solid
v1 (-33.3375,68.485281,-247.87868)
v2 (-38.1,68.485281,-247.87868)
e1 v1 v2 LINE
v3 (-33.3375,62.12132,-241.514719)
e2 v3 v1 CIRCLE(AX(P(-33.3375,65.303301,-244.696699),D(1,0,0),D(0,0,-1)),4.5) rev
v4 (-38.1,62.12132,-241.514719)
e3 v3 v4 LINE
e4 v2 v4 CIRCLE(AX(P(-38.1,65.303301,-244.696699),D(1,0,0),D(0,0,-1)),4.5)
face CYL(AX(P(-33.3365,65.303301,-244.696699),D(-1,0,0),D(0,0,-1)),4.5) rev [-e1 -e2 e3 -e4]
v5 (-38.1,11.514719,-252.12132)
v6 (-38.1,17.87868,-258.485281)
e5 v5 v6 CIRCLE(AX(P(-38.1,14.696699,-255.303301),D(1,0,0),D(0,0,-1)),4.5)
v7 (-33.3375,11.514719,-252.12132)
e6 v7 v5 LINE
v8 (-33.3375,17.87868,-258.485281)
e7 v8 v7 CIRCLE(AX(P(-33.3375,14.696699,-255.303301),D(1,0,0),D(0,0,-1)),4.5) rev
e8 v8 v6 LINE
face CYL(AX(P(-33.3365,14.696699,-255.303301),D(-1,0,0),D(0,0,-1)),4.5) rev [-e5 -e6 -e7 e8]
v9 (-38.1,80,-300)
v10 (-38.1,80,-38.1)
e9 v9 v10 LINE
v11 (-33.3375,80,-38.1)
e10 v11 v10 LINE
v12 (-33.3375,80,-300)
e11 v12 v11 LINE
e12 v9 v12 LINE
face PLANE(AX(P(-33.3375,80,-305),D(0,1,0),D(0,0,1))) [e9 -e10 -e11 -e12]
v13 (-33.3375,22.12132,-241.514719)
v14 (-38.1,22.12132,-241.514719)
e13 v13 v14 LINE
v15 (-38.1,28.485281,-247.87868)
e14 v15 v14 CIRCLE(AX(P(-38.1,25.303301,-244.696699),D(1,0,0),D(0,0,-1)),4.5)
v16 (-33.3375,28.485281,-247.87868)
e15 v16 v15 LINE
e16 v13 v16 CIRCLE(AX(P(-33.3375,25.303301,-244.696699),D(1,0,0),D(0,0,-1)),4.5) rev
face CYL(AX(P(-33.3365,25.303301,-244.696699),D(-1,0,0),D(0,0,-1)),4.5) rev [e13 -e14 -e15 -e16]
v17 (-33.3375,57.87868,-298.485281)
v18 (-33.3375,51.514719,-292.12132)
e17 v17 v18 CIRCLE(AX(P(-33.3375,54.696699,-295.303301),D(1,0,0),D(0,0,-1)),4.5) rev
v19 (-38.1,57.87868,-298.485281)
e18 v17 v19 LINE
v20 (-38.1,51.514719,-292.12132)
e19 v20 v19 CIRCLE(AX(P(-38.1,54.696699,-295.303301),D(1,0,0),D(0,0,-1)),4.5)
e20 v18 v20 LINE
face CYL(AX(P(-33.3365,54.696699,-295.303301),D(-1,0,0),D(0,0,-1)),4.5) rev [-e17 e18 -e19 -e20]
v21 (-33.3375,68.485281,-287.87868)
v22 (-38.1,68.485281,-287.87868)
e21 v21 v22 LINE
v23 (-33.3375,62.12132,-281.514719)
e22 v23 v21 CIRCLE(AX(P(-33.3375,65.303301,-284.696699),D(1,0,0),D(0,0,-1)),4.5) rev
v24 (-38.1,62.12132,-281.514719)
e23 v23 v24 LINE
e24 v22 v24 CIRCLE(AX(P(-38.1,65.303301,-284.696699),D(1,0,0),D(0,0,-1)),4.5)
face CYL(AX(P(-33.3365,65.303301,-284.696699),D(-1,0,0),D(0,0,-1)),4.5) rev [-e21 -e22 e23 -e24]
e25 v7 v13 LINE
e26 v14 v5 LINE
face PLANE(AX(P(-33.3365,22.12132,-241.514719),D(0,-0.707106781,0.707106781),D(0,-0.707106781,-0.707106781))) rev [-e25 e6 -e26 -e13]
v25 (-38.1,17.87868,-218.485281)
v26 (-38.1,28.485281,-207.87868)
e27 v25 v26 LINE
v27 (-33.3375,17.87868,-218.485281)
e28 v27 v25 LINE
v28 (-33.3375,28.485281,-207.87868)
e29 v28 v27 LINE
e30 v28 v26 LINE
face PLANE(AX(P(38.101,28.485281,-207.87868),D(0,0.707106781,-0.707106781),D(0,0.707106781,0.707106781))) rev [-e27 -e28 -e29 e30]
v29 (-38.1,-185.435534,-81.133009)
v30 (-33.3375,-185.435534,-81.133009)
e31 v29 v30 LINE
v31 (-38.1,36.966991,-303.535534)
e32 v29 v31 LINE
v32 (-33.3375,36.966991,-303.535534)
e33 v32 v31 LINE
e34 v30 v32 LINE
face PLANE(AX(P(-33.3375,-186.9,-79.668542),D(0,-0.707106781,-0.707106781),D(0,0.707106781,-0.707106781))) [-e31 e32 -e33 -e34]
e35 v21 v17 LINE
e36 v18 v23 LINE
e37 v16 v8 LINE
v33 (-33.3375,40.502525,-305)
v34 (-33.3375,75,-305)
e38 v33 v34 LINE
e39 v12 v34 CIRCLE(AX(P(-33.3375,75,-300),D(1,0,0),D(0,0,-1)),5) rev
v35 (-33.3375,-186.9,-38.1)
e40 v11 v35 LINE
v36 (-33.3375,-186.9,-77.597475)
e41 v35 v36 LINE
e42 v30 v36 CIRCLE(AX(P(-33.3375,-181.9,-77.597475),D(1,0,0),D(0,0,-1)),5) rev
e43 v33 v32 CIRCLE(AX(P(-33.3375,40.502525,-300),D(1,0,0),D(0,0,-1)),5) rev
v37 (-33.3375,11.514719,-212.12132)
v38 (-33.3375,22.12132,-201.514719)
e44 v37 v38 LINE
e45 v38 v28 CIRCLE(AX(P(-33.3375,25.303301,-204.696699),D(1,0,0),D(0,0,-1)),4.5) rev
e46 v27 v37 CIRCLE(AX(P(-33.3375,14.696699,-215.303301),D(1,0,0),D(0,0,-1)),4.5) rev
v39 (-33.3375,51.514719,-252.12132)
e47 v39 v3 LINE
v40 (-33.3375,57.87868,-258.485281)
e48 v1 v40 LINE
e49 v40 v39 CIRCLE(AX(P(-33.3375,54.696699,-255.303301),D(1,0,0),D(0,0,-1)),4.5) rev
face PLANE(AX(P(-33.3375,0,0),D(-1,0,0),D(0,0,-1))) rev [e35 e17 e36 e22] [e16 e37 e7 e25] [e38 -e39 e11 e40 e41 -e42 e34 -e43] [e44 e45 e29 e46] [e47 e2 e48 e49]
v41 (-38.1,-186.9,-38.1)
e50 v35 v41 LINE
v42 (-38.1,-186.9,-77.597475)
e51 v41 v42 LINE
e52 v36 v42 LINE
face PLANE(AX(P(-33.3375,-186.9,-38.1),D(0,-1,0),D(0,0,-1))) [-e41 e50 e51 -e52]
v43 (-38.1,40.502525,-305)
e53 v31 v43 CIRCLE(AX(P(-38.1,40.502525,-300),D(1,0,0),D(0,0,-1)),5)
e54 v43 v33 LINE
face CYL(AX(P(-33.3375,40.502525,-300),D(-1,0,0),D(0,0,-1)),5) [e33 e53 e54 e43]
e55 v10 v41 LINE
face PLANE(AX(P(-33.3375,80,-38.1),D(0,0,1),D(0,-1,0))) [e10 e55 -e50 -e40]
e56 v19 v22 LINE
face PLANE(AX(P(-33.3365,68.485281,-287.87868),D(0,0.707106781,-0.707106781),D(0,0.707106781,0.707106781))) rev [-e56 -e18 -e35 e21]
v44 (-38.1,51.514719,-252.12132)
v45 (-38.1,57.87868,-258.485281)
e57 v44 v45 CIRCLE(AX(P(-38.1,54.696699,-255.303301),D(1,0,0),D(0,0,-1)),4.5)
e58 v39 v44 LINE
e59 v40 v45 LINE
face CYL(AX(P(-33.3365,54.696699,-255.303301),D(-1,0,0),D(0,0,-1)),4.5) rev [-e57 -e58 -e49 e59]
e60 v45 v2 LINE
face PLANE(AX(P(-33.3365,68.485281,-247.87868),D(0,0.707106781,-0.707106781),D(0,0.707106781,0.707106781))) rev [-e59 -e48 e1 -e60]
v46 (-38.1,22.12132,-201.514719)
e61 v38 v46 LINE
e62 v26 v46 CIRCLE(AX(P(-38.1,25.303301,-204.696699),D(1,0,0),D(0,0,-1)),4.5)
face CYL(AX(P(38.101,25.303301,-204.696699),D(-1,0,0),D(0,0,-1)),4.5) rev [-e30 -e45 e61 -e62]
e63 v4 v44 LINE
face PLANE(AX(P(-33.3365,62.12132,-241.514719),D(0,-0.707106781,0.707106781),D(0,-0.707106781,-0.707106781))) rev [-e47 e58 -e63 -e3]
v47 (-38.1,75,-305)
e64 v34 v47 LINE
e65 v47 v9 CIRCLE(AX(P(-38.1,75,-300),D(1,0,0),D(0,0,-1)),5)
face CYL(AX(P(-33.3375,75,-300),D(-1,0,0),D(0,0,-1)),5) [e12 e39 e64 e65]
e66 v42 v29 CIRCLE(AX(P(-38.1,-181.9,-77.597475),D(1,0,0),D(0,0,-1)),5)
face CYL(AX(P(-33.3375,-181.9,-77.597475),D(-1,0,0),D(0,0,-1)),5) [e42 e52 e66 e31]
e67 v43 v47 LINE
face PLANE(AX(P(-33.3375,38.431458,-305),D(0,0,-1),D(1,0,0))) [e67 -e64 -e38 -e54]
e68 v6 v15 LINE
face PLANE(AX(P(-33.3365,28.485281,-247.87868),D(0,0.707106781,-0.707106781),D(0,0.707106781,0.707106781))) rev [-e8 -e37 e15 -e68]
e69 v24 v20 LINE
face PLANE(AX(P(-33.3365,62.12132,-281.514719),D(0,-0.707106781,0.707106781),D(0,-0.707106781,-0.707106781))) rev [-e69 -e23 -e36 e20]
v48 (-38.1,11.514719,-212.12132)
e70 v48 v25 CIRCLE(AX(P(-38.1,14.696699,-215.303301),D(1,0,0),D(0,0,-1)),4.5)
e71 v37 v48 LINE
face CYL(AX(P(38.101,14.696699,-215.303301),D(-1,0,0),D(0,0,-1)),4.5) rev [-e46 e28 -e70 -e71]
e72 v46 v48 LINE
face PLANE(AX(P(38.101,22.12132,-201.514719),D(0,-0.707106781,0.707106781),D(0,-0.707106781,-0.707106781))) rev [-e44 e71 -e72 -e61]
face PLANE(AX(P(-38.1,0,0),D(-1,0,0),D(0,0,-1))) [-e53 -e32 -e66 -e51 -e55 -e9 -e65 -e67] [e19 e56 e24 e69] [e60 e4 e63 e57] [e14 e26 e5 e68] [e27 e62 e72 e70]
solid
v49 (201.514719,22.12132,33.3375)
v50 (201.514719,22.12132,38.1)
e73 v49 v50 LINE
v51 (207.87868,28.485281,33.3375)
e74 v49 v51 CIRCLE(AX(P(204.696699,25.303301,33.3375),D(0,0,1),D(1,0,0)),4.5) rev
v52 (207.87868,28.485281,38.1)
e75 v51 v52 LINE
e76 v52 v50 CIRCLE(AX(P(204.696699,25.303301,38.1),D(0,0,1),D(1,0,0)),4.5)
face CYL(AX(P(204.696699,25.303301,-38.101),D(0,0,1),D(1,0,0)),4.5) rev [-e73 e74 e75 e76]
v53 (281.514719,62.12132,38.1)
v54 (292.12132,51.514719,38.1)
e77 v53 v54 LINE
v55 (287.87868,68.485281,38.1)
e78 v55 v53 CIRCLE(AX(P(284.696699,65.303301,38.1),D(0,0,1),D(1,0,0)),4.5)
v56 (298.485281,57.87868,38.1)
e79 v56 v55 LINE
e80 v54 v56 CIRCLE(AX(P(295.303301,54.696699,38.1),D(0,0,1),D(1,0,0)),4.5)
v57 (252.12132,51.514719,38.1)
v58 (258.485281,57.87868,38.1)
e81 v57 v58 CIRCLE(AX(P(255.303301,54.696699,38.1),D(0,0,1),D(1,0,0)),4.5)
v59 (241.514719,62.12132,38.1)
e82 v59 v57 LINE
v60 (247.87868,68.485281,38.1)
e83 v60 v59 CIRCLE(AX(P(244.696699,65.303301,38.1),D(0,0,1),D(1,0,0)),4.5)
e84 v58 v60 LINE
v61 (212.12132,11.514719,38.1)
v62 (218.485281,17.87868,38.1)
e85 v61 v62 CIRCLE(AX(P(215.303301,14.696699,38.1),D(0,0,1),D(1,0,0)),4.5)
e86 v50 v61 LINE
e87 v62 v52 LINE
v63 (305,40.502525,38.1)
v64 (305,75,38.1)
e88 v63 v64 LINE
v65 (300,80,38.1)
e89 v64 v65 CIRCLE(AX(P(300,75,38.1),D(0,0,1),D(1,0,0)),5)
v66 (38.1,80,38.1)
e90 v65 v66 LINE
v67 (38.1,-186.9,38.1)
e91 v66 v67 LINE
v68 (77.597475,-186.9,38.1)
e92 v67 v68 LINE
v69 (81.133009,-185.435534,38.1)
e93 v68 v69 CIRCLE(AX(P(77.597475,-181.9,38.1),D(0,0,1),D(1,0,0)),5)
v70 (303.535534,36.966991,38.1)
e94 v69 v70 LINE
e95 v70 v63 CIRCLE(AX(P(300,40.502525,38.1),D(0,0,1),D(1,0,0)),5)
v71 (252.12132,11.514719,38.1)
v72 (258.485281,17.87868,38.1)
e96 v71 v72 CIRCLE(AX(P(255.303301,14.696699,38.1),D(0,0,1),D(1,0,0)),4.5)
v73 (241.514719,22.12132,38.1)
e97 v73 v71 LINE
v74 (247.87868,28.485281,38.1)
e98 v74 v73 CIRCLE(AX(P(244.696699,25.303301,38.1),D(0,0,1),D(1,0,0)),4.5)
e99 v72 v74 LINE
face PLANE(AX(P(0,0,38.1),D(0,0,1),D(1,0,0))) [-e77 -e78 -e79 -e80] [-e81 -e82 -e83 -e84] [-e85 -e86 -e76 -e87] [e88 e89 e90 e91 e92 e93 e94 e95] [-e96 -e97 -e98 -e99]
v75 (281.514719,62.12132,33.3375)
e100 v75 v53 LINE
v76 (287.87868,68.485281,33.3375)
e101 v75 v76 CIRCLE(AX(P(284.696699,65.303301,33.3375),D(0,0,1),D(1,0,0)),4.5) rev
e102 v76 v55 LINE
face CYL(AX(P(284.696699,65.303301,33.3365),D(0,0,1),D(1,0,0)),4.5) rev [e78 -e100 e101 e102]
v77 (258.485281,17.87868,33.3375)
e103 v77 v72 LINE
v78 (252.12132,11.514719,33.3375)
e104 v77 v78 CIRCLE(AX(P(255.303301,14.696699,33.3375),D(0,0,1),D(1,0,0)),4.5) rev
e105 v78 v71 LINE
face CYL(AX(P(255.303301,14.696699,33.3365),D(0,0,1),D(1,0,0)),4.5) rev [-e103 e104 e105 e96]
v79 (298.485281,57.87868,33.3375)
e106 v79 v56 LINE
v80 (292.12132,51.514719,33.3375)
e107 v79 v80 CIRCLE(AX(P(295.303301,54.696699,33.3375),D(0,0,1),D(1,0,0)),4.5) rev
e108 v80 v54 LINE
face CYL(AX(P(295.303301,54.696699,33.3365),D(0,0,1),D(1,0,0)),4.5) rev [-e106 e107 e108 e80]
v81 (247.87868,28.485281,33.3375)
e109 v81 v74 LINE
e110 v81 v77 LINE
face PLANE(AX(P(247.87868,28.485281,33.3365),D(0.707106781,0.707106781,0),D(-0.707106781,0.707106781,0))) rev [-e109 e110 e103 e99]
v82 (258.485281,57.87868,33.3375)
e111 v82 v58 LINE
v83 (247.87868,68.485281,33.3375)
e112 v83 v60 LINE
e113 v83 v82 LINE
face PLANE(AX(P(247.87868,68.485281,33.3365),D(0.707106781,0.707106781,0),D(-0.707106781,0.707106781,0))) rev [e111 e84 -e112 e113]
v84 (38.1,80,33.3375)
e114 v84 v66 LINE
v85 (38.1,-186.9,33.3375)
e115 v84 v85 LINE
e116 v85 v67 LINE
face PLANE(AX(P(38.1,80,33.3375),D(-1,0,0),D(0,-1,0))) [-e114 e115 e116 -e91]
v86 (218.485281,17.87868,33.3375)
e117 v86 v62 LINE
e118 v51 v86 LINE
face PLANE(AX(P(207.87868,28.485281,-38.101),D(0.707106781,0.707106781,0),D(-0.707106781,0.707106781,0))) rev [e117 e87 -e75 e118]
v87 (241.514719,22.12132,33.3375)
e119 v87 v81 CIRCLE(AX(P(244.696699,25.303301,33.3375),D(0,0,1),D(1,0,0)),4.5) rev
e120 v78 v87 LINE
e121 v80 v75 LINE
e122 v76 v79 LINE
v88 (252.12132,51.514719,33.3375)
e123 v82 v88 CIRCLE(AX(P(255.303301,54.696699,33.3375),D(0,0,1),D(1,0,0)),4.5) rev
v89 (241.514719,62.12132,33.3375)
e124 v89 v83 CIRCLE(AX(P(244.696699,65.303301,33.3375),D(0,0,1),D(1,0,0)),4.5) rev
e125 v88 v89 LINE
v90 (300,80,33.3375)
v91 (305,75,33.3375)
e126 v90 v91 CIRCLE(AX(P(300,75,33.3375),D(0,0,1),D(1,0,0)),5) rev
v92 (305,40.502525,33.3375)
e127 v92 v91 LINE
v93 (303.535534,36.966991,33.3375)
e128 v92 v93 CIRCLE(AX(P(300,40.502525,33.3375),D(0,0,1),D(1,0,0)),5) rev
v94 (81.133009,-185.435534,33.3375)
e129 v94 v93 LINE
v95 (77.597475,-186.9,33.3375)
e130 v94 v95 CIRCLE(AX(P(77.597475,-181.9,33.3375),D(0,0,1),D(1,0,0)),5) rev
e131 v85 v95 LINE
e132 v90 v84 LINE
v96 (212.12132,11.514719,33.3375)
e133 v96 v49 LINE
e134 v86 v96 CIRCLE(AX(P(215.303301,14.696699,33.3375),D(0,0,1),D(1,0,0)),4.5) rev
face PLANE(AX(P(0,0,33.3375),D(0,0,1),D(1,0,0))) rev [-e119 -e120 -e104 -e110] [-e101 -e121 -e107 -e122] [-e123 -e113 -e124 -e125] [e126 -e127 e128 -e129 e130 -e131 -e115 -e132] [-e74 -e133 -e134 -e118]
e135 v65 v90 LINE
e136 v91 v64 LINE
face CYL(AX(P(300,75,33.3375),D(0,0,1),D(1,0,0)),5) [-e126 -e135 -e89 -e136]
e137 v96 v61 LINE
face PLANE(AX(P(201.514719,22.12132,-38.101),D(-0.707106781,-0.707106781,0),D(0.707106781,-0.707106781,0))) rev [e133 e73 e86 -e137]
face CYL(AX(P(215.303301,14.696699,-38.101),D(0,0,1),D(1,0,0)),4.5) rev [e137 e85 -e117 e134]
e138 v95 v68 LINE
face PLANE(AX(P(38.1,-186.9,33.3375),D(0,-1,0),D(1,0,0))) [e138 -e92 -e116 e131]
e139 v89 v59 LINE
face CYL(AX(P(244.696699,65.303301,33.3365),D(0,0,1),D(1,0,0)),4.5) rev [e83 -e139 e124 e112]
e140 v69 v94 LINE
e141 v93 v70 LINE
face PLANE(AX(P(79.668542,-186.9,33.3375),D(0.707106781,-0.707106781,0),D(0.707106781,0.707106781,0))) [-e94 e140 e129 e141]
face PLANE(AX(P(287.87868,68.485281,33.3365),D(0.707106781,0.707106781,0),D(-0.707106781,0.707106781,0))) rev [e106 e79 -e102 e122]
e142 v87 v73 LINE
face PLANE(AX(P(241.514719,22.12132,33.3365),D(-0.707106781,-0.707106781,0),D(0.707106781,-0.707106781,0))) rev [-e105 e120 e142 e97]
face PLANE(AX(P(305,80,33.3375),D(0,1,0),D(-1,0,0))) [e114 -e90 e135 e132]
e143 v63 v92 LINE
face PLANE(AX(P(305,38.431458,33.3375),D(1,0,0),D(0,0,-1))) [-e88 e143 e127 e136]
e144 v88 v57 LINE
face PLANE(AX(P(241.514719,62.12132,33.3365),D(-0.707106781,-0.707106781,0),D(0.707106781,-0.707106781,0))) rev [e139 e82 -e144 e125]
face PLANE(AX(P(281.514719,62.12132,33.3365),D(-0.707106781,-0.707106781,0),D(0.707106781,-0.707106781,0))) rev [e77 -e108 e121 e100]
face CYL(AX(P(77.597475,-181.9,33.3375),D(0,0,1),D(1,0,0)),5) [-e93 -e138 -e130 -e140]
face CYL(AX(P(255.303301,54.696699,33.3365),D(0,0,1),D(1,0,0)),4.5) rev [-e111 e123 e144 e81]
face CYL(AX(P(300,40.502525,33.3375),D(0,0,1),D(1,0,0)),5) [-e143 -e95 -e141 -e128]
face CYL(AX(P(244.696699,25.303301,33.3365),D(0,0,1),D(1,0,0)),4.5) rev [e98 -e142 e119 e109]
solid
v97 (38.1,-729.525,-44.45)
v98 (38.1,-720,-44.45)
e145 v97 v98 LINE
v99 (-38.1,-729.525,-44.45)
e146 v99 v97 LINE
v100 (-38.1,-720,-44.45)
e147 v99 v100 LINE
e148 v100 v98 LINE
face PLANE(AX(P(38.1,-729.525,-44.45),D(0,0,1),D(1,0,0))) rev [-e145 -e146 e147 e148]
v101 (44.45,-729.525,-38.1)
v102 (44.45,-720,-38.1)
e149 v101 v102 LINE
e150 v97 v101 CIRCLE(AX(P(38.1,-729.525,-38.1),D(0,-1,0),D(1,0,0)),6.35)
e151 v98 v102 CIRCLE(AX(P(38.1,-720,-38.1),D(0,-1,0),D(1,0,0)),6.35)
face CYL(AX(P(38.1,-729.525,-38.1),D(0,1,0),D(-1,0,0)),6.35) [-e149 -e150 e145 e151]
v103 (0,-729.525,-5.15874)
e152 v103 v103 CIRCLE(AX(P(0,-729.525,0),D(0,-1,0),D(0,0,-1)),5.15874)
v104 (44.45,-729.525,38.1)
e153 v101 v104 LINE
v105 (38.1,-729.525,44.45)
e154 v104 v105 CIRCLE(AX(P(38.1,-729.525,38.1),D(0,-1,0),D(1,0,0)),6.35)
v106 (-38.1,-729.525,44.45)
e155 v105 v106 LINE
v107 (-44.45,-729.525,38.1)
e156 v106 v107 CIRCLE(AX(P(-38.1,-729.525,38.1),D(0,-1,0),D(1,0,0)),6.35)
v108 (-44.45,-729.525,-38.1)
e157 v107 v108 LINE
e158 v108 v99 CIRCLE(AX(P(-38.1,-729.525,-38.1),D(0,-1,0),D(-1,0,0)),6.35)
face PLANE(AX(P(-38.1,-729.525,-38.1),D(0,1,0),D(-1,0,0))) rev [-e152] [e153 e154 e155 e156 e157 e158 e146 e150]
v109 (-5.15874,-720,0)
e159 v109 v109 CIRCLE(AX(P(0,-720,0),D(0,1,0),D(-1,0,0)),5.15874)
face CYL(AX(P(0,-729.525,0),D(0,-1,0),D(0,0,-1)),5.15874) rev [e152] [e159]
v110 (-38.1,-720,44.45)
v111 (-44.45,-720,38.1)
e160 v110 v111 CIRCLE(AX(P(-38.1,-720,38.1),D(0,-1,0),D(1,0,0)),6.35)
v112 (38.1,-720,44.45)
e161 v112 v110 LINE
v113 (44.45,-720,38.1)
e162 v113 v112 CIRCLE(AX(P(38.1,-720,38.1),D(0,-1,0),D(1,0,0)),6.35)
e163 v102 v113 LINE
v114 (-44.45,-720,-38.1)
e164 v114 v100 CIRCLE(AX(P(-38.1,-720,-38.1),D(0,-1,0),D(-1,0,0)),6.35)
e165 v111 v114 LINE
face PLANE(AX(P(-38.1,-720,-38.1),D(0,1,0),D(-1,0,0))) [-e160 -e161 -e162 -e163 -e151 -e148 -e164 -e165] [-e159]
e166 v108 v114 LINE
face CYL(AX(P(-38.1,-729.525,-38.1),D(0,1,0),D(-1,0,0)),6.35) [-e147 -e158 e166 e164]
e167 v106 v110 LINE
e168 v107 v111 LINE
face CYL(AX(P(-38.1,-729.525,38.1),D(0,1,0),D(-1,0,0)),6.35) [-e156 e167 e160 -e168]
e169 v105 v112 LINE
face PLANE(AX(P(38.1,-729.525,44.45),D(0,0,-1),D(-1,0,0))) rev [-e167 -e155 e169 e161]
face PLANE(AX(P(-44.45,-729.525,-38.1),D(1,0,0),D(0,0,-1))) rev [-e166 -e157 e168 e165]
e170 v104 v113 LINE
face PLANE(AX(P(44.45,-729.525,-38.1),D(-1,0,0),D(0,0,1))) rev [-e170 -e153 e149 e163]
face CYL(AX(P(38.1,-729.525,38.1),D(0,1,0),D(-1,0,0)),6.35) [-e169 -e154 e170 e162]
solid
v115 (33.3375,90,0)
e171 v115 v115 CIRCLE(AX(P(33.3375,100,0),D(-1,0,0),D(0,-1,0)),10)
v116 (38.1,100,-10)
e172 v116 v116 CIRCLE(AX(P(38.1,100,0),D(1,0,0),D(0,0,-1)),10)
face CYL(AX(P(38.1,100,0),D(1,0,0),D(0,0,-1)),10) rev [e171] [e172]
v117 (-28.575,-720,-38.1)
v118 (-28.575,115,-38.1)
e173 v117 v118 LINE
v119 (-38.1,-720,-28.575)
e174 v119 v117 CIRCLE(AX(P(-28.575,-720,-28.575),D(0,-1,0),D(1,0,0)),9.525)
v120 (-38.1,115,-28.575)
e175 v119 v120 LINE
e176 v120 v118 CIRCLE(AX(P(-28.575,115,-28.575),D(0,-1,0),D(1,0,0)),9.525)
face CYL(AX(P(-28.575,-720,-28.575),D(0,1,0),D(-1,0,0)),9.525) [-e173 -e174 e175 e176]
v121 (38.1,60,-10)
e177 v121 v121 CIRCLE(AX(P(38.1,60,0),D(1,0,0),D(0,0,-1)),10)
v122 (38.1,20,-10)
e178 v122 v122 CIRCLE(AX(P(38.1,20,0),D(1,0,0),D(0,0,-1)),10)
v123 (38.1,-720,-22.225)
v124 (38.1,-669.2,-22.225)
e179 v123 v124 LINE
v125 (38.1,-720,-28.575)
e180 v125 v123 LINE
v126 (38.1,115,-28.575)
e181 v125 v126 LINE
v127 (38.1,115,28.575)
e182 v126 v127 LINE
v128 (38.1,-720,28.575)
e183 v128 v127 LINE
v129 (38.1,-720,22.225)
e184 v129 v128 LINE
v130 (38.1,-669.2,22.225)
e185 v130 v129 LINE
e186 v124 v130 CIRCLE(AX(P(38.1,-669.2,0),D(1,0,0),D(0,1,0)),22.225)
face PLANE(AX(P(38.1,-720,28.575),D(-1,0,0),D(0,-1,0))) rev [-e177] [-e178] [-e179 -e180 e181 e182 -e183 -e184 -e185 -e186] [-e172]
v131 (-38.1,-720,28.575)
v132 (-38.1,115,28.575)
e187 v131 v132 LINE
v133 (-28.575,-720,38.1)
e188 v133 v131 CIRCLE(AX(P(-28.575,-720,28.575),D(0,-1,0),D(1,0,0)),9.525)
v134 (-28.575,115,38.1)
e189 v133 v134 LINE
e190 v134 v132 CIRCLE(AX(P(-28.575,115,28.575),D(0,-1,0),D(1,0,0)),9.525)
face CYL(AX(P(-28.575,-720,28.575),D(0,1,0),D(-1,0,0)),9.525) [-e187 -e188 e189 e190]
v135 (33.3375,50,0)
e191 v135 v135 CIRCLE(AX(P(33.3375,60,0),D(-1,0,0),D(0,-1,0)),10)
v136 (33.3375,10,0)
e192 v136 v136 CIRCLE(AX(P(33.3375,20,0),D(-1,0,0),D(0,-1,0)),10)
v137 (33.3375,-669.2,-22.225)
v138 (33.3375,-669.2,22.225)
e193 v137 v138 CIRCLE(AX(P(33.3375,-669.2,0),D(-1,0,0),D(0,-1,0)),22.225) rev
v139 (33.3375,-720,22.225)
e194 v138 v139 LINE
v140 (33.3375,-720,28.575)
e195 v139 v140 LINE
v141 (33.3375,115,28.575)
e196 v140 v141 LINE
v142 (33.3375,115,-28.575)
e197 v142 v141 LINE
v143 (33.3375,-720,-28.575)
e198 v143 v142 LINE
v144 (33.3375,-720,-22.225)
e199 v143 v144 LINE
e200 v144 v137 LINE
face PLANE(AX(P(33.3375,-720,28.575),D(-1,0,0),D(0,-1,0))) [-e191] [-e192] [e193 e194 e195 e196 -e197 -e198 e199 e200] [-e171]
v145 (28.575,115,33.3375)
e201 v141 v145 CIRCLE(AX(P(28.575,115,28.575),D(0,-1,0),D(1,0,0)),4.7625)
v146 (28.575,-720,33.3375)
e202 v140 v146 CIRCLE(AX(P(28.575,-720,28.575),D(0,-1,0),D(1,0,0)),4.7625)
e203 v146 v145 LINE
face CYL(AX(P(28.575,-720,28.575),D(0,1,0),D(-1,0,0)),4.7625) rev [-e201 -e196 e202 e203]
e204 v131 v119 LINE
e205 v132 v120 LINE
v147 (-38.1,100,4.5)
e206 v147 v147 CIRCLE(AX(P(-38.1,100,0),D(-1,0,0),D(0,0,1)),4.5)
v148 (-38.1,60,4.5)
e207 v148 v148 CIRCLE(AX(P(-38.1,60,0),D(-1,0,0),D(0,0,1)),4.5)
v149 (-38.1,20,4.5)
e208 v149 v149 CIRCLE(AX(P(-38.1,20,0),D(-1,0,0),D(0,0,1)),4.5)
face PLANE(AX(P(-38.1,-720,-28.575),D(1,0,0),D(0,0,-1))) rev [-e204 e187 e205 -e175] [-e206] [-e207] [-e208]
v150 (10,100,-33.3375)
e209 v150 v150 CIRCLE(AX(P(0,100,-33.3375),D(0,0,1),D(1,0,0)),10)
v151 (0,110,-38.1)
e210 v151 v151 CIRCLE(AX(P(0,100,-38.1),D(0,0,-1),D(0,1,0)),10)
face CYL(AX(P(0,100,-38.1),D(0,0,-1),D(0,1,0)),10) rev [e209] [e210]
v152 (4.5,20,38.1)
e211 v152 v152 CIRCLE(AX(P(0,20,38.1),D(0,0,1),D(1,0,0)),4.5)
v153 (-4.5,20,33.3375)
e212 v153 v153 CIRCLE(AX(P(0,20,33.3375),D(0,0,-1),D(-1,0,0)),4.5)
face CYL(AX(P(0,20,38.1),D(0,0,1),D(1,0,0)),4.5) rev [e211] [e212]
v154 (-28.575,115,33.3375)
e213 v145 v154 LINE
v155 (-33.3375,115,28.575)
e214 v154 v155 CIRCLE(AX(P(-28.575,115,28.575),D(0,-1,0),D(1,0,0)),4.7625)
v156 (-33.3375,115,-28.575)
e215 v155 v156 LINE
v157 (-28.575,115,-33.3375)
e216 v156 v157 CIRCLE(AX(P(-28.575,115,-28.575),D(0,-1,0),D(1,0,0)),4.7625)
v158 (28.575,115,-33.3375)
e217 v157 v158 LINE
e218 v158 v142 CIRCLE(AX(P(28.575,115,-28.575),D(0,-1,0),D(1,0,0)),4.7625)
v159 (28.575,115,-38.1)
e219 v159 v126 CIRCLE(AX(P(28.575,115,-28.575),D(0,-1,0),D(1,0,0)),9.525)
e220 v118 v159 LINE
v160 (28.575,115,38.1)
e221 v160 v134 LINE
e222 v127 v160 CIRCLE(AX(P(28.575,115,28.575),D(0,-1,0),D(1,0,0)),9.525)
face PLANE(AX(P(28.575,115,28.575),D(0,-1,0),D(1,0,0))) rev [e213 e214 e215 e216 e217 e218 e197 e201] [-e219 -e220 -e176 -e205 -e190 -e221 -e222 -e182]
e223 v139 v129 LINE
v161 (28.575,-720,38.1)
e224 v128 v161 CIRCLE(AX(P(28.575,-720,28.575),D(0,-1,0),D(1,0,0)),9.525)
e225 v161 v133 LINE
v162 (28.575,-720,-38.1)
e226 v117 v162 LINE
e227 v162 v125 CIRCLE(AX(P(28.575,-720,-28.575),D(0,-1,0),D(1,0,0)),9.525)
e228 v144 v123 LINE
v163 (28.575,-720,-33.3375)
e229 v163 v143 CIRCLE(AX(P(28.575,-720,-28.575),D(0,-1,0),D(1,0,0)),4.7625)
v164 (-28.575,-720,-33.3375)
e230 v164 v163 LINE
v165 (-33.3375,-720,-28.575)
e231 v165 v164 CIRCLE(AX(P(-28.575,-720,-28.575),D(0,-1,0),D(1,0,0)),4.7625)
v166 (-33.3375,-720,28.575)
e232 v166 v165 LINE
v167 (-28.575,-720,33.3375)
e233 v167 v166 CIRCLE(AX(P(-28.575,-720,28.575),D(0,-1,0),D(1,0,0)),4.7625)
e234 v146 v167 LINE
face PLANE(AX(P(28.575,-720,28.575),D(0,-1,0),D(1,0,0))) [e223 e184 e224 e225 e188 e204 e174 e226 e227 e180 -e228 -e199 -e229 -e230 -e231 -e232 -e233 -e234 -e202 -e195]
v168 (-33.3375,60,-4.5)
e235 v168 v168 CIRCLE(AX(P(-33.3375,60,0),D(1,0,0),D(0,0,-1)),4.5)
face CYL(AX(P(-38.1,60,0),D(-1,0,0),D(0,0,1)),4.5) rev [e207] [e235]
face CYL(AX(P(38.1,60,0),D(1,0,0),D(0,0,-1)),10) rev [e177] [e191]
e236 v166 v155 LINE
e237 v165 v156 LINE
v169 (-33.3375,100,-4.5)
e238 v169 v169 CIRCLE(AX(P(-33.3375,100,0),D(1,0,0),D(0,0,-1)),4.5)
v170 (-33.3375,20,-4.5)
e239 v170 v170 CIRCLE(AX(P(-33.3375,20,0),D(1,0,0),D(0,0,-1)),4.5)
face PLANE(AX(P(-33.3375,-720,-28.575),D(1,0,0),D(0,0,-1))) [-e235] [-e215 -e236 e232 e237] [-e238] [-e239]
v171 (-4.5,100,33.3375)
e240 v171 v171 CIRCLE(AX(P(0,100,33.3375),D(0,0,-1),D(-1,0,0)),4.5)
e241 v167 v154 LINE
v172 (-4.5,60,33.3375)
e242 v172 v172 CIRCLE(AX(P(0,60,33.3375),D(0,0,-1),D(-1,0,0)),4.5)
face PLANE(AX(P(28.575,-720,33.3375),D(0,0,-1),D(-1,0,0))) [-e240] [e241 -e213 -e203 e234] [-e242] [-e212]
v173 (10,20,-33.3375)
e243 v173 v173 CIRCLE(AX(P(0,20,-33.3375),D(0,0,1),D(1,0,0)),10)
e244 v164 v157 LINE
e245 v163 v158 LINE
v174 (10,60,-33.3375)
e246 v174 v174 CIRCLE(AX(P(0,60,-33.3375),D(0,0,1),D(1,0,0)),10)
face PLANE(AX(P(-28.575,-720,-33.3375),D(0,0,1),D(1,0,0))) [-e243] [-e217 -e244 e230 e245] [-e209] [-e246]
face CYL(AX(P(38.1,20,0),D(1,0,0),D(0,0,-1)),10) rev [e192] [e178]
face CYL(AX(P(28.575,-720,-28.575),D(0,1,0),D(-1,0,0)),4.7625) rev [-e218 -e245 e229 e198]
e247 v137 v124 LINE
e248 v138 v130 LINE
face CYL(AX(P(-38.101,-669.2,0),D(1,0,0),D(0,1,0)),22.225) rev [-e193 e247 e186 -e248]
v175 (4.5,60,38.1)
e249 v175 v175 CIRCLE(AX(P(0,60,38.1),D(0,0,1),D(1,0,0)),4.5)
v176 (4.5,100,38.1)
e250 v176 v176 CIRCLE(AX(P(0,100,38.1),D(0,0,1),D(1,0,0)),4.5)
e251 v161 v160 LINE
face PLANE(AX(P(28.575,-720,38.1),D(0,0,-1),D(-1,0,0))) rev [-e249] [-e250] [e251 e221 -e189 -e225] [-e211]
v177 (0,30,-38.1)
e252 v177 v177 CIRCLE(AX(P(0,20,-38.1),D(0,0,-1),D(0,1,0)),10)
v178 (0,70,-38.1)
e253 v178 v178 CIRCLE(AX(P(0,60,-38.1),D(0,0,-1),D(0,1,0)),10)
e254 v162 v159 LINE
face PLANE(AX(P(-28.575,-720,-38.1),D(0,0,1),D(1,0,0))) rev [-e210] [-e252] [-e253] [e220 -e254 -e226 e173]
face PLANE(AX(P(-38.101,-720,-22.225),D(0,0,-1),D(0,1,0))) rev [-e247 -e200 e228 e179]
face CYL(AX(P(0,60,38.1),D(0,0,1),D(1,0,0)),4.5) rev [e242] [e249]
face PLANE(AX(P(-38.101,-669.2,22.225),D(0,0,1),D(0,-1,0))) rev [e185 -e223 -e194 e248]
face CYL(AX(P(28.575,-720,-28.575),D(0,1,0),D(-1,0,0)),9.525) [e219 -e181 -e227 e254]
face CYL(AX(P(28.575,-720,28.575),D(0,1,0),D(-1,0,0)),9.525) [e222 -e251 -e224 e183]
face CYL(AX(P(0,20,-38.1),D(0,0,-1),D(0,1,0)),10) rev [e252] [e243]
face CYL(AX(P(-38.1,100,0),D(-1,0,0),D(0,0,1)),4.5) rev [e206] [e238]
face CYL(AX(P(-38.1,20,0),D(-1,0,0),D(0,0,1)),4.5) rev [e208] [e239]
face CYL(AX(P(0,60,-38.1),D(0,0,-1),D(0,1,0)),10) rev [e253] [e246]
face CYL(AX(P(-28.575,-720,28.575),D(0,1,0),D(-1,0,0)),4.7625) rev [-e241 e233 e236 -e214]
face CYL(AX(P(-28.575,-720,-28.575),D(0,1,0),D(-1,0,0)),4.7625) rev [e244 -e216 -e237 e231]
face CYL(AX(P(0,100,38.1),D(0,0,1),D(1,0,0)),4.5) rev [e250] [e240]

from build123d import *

# Parameters (mm, degrees)
TUBE_SQUARE_TS3X3X0_1875_1_DEPTH    = 835
CUT_EXTRUDE3_REACH                  = 727.023
BASE_FLANGE1_DEPTH                  = 4.7625
SKETCH18_W                          = 4.5
SKETCH18_H                          = 4.7635
M8_CLEARANCE_HOLE1_AT_2_COUNT       = 2
M8_CLEARANCE_HOLE1_AT_2_PITCH       = 40
M8_CLEARANCE_HOLE1_AT_3_COUNT       = 2
M8_CLEARANCE_HOLE1_AT_3_PITCH       = 80
SKETCH21_W                          = 10
SKETCH21_H                          = 4.7635
F_20_0_20_DIAMETER_HOLE1_AT_2_COUNT = 2
F_20_0_20_DIAMETER_HOLE1_AT_2_PITCH = 40
F_20_0_20_DIAMETER_HOLE1_AT_3_COUNT = 2
F_20_0_20_DIAMETER_HOLE1_AT_3_PITCH = 80
CUT_EXTRUDE2_DEPTH                  = 4.7625
FILLET1_R                           = 5
BASE_FLANGE2_DEPTH                  = 9.525
SKETCH26_W                          = 5.15874
SKETCH26_H                          = 9.526
MIRROR1_COPY_1_SKETCH_W             = 4.5
MIRROR1_COPY_1_SKETCH_H             = 4.7635
MIRROR1_COPY_2_SKETCH_W             = 4.5
MIRROR1_COPY_2_SKETCH_H             = 4.7635
MIRROR1_COPY_3_SKETCH_W             = 10
MIRROR1_COPY_3_SKETCH_H             = 4.7635
MIRROR1_COPY_4_SKETCH_W             = 10
MIRROR1_COPY_4_SKETCH_H             = 4.7635


# Sheet-metal steps are written as plain solids
with BuildPart() as part:
    # Sketch11 → Tube square TS3X3X0.1875(1) (new body)
    with BuildSketch(Plane.XZ.offset(-115)):
        with BuildLine():
            Line((-28.575, -38.1), (28.575, -38.1))
            ThreePointArc((28.575, -38.1), (35.310192091, -35.310192091), (38.1, -28.575))
            Line((38.1, -28.575), (38.1, 28.575))
            ThreePointArc((38.1, 28.575), (35.310192091, 35.310192091), (28.575, 38.1))
            Line((28.575, 38.1), (-28.575, 38.1))
            ThreePointArc((-28.575, 38.1), (-35.310192091, 35.310192091), (-38.1, 28.575))
            Line((-38.1, 28.575), (-38.1, -28.575))
            ThreePointArc((-38.1, -28.575), (-35.310192091, -35.310192091), (-28.575, -38.1))
        make_face()
        with BuildLine():
            Line((-28.575, -33.3375), (28.575, -33.3375))
            ThreePointArc((28.575, -33.3375), (31.942596045, -31.942596045), (33.3375, -28.575))
            Line((33.3375, -28.575), (33.3375, 28.575))
            ThreePointArc((33.3375, 28.575), (31.942596045, 31.942596045), (28.575, 33.3375))
            Line((28.575, 33.3375), (-28.575, 33.3375))
            ThreePointArc((-28.575, 33.3375), (-31.942596045, 31.942596045), (-33.3375, 28.575))
            Line((-33.3375, 28.575), (-33.3375, -28.575))
            ThreePointArc((-33.3375, -28.575), (-31.942596045, -31.942596045), (-28.575, -33.3375))
        make_face(mode=Mode.SUBTRACT)
    extrude(amount=TUBE_SQUARE_TS3X3X0_1875_1_DEPTH)

    # Sketch27 → Cut-Extrude3 (cut, up to next)
    with BuildSketch(Plane(origin=(38.1, 0, 0), x_dir=(0, 0, -1), z_dir=(1, 0, 0)), mode=Mode.PRIVATE) as cut_extrude3_sk1:
        with BuildLine():
            Line((-22.225, -720), (22.225, -720))
            Line((22.225, -720), (22.225, -669.2))
            ThreePointArc((22.225, -669.2), (0, -646.975), (-22.225, -669.2))
            Line((-22.225, -669.2), (-22.225, -720))
        make_face()
    cut_extrude3_tool1 = extrude(cut_extrude3_sk1.sketch, amount=-CUT_EXTRUDE3_REACH, mode=Mode.PRIVATE) & part.part
    add(cut_extrude3_tool1.solids().sort_by_distance((38.1, -685.692007, 0))[0], mode=Mode.SUBTRACT)

    # Sketch18 → M8 Clearance Hole1 (revolve, cut)
    with BuildSketch(Plane(origin=(0, 100, 38.1), x_dir=(0, -1, 0), z_dir=(1, 0, 0))):
        with Locations((2.25, 2.38175)):
            Rectangle(SKETCH18_W, SKETCH18_H)
    m8_clearance_hole1 = revolve(axis=Axis((0, 100, 44.45), (0, 0, -1)), mode=Mode.SUBTRACT)

    # M8 Clearance Hole1 at 2: M8 Clearance Hole1 ×2
    with Locations(*[(0, -i * M8_CLEARANCE_HOLE1_AT_2_PITCH, 0) for i in range(1, M8_CLEARANCE_HOLE1_AT_2_COUNT)]):
        add(m8_clearance_hole1, mode=Mode.SUBTRACT)

    # M8 Clearance Hole1 at 3: M8 Clearance Hole1 ×2
    with Locations(*[(0, -i * M8_CLEARANCE_HOLE1_AT_3_PITCH, 0) for i in range(1, M8_CLEARANCE_HOLE1_AT_3_COUNT)]):
        add(m8_clearance_hole1, mode=Mode.SUBTRACT)

    # Sketch21 → Ø20.0 (20) Diameter Hole1 (revolve, cut)
    with BuildSketch(Plane(origin=(0, 100, -38.1), x_dir=(0, 1, 0), z_dir=(1, 0, 0))):
        with Locations((5, 2.38175)):
            Rectangle(SKETCH21_W, SKETCH21_H)
    f_20_0_20_diameter_hole1 = revolve(axis=Axis((0, 100, -44.45), (0, 0, 1)), mode=Mode.SUBTRACT)

    # Ø20.0 (20) Diameter Hole1 at 2: Ø20.0 (20) Diameter Hole1 ×2
    with Locations(*[(0, -i * F_20_0_20_DIAMETER_HOLE1_AT_2_PITCH, 0) for i in range(1, F_20_0_20_DIAMETER_HOLE1_AT_2_COUNT)]):
        add(f_20_0_20_diameter_hole1, mode=Mode.SUBTRACT)

    # Ø20.0 (20) Diameter Hole1 at 3: Ø20.0 (20) Diameter Hole1 ×2
    with Locations(*[(0, -i * F_20_0_20_DIAMETER_HOLE1_AT_3_PITCH, 0) for i in range(1, F_20_0_20_DIAMETER_HOLE1_AT_3_COUNT)]):
        add(f_20_0_20_diameter_hole1, mode=Mode.SUBTRACT)

    # Mirror1: M8 Clearance Hole1, Ø20.0 (20) Diameter Hole1 across plane
    add(m8_clearance_hole1.mirror(Plane(origin=(0, 0, 0), x_dir=(-0.7071067811865465, 0, 0.7071067811865486), z_dir=(0.7071067811865488, 0, 0.7071067811865464))), mode=Mode.SUBTRACT)
    add(f_20_0_20_diameter_hole1.mirror(Plane(origin=(0, 0, 0), x_dir=(-0.7071067811865465, 0, 0.7071067811865486), z_dir=(0.7071067811865488, 0, 0.7071067811865464))), mode=Mode.SUBTRACT)

    # Mirror1 copy 1 sketch → Mirror1 copy 1 (revolve, cut)
    with BuildSketch(Plane(origin=(-38.1, 60, 0), x_dir=(0, -1, 0), z_dir=(0, 0, -1))):
        with Locations((2.25, -2.38175)):
            Rectangle(MIRROR1_COPY_1_SKETCH_W, MIRROR1_COPY_1_SKETCH_H)
    revolve(axis=Axis((-44.45, 60, 0), (-1, 0, 0)), mode=Mode.SUBTRACT)

    # Mirror1 copy 2 sketch → Mirror1 copy 2 (revolve, cut)
    with BuildSketch(Plane(origin=(-38.1, 20, 0), x_dir=(0, -1, 0), z_dir=(0, 0, -1))):
        with Locations((2.25, -2.38175)):
            Rectangle(MIRROR1_COPY_2_SKETCH_W, MIRROR1_COPY_2_SKETCH_H)
    revolve(axis=Axis((-44.45, 20, 0), (-1, 0, 0)), mode=Mode.SUBTRACT)

    # Mirror1 copy 3 sketch → Mirror1 copy 3 (revolve, cut)
    with BuildSketch(Plane(origin=(38.1, 60, 0), x_dir=(0, 1, 0), z_dir=(0, 0, -1))):
        with Locations((5, -2.38175)):
            Rectangle(MIRROR1_COPY_3_SKETCH_W, MIRROR1_COPY_3_SKETCH_H)
    revolve(axis=Axis((44.45, 60, 0), (1, 0, 0)), mode=Mode.SUBTRACT)

    # Mirror1 copy 4 sketch → Mirror1 copy 4 (revolve, cut)
    with BuildSketch(Plane(origin=(38.1, 20, 0), x_dir=(0, 1, 0), z_dir=(0, 0, -1))):
        with Locations((5, -2.38175)):
            Rectangle(MIRROR1_COPY_4_SKETCH_W, MIRROR1_COPY_4_SKETCH_H)
    revolve(axis=Axis((44.45, 20, 0), (1, 0, 0)), mode=Mode.SUBTRACT)


with BuildPart() as body_2:
    # Sketch12 → Base-Flange1 (new body)
    with BuildSketch(Plane.XY.offset(38.1)):
        Polygon((38.1, 80), (38.1, -186.9), (79.668542495, -186.9), (305, 38.431457505), (305, 80), align=None)
    extrude(amount=-BASE_FLANGE1_DEPTH)

    # Sketch19 → Cut-Extrude2 (cut)
    with BuildSketch(Plane.XY.offset(38.1)):
        with BuildLine():
            Line((207.878679656, 28.485281374), (218.485281374, 17.878679656))
            ThreePointArc((218.485281374, 17.878679656), (218.485281374, 11.514718626), (212.121320344, 11.514718626))
            Line((212.121320344, 11.514718626), (201.514718626, 22.121320344))
            ThreePointArc((201.514718626, 22.121320344), (201.514718626, 28.485281374), (207.878679656, 28.485281374))
        make_face()
    cut_extrude2 = extrude(amount=-CUT_EXTRUDE2_DEPTH, mode=Mode.SUBTRACT)

    # Sketch-Pattern1: Cut-Extrude2 at 3 more places
    with Locations((40, 0, 0), (40, 40, 0), (80, 40, 0)):
        add(cut_extrude2, mode=Mode.SUBTRACT)

    # Fillet1
    fillet1_edges = [body_2.edges().sort_by_distance(p)[0] for p in [
        (305, 80, 35.71875),
        (305, 38.431457505, 35.71875),
        (79.668542495, -186.9, 35.71875),
    ]]
    fillet(fillet1_edges, radius=FILLET1_R)


with BuildPart() as body_3:
    # Sketch22 → Base-Flange2 (new body)
    with BuildSketch(Plane.XZ.offset(720)):
        with BuildLine():
            Line((38.1, -44.45), (-38.1, -44.45))
            ThreePointArc((-38.1, -44.45), (-42.590128061, -42.590128061), (-44.45, -38.1))
            Line((-44.45, -38.1), (-44.45, 38.1))
            ThreePointArc((-44.45, 38.1), (-42.590128061, 42.590128061), (-38.1, 44.45))
            Line((-38.1, 44.45), (38.1, 44.45))
            ThreePointArc((38.1, 44.45), (42.590128061, 42.590128061), (44.45, 38.1))
            Line((44.45, 38.1), (44.45, -38.1))
            ThreePointArc((44.45, -38.1), (42.590128061, -42.590128061), (38.1, -44.45))
        make_face()
    extrude(amount=BASE_FLANGE2_DEPTH)

    # Sketch26 → 3/8 Clearance Hole1 (revolve, cut)
    with BuildSketch(Plane(origin=(0, -729.525, 0), x_dir=(0, 0, -1), z_dir=(1, 0, 0))):
        with Locations((2.57937, 4.763)):
            Rectangle(SKETCH26_W, SKETCH26_H)
    revolve(axis=Axis((0, -735.875, 0), (0, 1, 0)), mode=Mode.SUBTRACT)


with BuildPart() as body_4:
    # Mirror2: mirrored copy
    add(body_2.part.mirror(Plane(origin=(0, 0, 0), x_dir=(-0.7071067811865465, 0, 0.7071067811865486), z_dir=(0.7071067811865488, 0, 0.7071067811865464))))


solid = Compound([part.part, body_2.part, body_3.part, body_4.part])
